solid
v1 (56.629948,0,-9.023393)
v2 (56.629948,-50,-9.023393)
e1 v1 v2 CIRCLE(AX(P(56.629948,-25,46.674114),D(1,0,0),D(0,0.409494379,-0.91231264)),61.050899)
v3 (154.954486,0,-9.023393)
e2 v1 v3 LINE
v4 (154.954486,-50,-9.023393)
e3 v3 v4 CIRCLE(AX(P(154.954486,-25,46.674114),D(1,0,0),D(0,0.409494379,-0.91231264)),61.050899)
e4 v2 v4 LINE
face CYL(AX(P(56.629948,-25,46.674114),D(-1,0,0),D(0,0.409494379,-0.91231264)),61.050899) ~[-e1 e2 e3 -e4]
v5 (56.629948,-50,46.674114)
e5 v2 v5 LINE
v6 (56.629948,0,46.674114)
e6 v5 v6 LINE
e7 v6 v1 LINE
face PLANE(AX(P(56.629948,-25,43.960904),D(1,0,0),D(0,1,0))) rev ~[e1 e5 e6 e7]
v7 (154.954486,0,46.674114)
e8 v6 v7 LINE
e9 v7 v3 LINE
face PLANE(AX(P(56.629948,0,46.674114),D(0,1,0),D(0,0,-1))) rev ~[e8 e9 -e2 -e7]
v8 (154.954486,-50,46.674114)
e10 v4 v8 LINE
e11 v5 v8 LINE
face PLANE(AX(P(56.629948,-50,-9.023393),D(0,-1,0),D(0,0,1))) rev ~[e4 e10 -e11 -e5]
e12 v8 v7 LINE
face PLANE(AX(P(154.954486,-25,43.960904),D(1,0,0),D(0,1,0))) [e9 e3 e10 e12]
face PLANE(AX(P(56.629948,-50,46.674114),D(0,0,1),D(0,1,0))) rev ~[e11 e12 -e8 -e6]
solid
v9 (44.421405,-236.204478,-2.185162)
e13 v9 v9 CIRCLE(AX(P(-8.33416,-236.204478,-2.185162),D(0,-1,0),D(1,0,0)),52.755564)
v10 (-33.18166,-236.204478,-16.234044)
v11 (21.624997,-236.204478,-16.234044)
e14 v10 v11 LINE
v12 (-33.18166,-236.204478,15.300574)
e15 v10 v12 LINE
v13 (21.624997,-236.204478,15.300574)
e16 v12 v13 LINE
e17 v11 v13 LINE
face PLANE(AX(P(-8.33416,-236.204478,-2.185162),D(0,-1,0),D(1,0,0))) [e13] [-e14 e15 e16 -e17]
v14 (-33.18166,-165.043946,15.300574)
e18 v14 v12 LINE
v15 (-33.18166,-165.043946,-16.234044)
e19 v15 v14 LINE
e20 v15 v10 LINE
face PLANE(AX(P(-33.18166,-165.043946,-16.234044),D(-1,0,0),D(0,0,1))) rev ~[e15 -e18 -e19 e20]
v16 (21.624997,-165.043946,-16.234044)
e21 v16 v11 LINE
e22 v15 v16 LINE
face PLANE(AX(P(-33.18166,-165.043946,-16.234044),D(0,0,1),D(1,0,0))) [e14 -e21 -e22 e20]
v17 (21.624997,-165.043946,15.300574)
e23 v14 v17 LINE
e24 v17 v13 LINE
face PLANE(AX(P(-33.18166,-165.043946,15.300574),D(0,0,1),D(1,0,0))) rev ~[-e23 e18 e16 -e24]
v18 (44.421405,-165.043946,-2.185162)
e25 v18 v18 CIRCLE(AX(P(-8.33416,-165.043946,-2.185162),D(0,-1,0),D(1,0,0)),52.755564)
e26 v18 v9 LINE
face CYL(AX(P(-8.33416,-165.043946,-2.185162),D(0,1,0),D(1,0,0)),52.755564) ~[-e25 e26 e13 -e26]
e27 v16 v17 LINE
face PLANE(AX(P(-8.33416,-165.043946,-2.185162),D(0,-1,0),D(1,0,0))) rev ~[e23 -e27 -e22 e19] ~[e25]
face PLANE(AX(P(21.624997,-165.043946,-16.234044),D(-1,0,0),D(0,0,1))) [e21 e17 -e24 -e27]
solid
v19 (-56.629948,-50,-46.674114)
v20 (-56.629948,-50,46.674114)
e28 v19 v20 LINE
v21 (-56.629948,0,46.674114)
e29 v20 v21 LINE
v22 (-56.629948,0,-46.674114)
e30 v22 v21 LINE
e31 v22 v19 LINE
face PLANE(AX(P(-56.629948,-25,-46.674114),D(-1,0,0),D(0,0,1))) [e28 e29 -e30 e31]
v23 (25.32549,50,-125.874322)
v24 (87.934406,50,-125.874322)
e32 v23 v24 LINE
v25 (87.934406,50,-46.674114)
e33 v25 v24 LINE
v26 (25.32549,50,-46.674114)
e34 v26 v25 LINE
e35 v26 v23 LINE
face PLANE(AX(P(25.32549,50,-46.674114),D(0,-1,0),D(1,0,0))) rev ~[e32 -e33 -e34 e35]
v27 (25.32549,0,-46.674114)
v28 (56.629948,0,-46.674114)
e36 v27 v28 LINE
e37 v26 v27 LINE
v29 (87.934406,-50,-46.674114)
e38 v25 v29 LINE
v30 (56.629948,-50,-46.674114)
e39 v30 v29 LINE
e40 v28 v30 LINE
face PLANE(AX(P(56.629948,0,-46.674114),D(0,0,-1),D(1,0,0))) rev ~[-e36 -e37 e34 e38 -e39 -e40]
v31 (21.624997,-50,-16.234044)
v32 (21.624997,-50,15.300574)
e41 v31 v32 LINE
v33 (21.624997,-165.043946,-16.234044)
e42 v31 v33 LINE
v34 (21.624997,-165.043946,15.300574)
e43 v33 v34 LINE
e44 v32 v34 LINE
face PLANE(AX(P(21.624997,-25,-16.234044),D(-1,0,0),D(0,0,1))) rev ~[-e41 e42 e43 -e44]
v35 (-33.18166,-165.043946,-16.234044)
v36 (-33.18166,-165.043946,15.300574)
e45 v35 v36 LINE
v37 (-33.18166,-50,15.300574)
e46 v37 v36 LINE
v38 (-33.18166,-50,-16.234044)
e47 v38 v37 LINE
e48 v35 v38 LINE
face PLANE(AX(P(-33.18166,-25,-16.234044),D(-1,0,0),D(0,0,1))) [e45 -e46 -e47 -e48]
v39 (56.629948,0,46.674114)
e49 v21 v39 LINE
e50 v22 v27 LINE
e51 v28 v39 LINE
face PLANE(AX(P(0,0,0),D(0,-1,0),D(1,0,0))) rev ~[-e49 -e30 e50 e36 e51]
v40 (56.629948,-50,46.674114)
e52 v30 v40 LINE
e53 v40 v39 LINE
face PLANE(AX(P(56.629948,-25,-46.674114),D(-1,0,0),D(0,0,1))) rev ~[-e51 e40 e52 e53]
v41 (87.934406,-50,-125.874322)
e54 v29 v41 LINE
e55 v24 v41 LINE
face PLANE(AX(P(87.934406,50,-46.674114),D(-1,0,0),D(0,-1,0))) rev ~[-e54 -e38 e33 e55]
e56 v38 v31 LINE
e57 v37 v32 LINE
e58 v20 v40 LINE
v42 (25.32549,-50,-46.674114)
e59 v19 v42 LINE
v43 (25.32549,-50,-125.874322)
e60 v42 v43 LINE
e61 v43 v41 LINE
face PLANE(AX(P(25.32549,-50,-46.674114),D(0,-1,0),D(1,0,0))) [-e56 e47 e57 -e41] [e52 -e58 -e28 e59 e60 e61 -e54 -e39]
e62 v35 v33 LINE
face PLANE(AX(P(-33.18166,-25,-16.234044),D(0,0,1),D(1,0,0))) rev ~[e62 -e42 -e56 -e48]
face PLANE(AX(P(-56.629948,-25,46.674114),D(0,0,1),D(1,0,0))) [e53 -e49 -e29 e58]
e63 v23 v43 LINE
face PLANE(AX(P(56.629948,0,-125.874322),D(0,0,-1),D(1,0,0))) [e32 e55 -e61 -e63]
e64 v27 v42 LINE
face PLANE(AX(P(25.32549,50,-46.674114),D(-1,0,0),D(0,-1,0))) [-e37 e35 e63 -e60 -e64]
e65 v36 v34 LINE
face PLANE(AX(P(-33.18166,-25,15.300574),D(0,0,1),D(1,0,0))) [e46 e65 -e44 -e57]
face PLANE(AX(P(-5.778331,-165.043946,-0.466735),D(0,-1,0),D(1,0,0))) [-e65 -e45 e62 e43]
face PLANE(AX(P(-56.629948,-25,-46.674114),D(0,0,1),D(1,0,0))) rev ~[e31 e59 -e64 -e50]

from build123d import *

# Parameters (mm, degrees)
F0_W        = 113.259896636
F0_H        = 93.3482274413
F1_DEPTH    = 25
F2_W        = 54.8066571355
F2_H        = 31.5346177667
F3_DEPTH    = 115.0439456105
F1_FACE_W   = 113.259896636
F1_FACE_H   = 93.3482274413
F1_FACE_W_2 = 54.8066571355
F1_FACE_H_2 = 31.5346177667
F4_W        = 54.8066571355
F4_H        = 31.5346177667
F5_DEPTH    = 25
F6_R        = 52.7555643641
F6_W        = 54.8066571355
F6_H        = 31.5346177667
F7_DEPTH    = 71.1605325341
F8_W        = 62.6089163125
F8_H        = 100
F9_DEPTH    = 79.2002081871
F14_DEPTH   = 98.3245372772


# Not quite as in the source:
# - the program builds the solid bodies; features that only make, move or delete a surface that nothing else refers to are left out


with BuildPart() as f1:
    # F0 (on Front) → F1 (new body)
    with BuildSketch(Plane.XZ):
        Rectangle(F0_W, F0_H)
    extrude(amount=F1_DEPTH)

    # F2 (on face) → F3 (join)
    with BuildSketch(Plane.XZ.offset(25)):
        with Locations((-5.7783313096, -0.4667351022)):
            Rectangle(F2_W, F2_H)
    extrude(amount=F3_DEPTH)

    # F1_face (on face) + F4 (on face) → F5 (join)
    with BuildSketch(Plane.XZ.offset(25)):
        Rectangle(F1_FACE_W, F1_FACE_H)
        with Locations((-5.7783313096, -0.4667351022)):
            Rectangle(F1_FACE_W_2, F1_FACE_H_2, mode=Mode.SUBTRACT)
    with BuildSketch(Plane.XZ.offset(140.0439456105)):
        with Locations((-5.7783313096, -0.4667351022)):
            Rectangle(F4_W, F4_H)
    extrude(amount=F5_DEPTH)

    # F8 (on face) → F9 (join)
    with BuildSketch(Plane(origin=(0, 0, -46.6741137207), x_dir=(1, 0, 0), z_dir=(0, 0, -1))):
        with Locations((56.629948318, 0)):
            Rectangle(F8_W, F8_H)
    extrude(amount=F9_DEPTH)


with BuildPart() as f7:
    # F6 (on face) → F7 (new body)
    with BuildSketch(Plane.XZ.offset(165.0439456105)):
        with Locations((-8.3341598511, -2.1851621568)):
            Circle(F6_R)
        with Locations((-5.7783313096, -0.4667351022)):
            Rectangle(F6_W, F6_H, mode=Mode.SUBTRACT)
    extrude(amount=F7_DEPTH)


with BuildPart() as f14:
    # F13 (on face) → F14 (new body)
    with BuildSketch(Plane.YZ.offset(56.629948318)):
        with BuildLine():
            ThreePointArc((0, -9.0233932707), (26.2517549134, 13.5007825139), (36.0508991339, 46.6741137207))
            ThreePointArc((36.0508991339, 46.6741137207), (-58.1733312068, 97.925868634), (-50, -9.0233932707))
            Line((-50, -9.0233932707), (-50, 46.6741137207))
            Line((-50, 46.6741137207), (0, 46.6741137207))
            Line((0, 46.6741137207), (0, -9.0233932707))
        make_face()
    extrude(amount=F14_DEPTH)


solid = Compound([f1.part, f7.part, f14.part])
